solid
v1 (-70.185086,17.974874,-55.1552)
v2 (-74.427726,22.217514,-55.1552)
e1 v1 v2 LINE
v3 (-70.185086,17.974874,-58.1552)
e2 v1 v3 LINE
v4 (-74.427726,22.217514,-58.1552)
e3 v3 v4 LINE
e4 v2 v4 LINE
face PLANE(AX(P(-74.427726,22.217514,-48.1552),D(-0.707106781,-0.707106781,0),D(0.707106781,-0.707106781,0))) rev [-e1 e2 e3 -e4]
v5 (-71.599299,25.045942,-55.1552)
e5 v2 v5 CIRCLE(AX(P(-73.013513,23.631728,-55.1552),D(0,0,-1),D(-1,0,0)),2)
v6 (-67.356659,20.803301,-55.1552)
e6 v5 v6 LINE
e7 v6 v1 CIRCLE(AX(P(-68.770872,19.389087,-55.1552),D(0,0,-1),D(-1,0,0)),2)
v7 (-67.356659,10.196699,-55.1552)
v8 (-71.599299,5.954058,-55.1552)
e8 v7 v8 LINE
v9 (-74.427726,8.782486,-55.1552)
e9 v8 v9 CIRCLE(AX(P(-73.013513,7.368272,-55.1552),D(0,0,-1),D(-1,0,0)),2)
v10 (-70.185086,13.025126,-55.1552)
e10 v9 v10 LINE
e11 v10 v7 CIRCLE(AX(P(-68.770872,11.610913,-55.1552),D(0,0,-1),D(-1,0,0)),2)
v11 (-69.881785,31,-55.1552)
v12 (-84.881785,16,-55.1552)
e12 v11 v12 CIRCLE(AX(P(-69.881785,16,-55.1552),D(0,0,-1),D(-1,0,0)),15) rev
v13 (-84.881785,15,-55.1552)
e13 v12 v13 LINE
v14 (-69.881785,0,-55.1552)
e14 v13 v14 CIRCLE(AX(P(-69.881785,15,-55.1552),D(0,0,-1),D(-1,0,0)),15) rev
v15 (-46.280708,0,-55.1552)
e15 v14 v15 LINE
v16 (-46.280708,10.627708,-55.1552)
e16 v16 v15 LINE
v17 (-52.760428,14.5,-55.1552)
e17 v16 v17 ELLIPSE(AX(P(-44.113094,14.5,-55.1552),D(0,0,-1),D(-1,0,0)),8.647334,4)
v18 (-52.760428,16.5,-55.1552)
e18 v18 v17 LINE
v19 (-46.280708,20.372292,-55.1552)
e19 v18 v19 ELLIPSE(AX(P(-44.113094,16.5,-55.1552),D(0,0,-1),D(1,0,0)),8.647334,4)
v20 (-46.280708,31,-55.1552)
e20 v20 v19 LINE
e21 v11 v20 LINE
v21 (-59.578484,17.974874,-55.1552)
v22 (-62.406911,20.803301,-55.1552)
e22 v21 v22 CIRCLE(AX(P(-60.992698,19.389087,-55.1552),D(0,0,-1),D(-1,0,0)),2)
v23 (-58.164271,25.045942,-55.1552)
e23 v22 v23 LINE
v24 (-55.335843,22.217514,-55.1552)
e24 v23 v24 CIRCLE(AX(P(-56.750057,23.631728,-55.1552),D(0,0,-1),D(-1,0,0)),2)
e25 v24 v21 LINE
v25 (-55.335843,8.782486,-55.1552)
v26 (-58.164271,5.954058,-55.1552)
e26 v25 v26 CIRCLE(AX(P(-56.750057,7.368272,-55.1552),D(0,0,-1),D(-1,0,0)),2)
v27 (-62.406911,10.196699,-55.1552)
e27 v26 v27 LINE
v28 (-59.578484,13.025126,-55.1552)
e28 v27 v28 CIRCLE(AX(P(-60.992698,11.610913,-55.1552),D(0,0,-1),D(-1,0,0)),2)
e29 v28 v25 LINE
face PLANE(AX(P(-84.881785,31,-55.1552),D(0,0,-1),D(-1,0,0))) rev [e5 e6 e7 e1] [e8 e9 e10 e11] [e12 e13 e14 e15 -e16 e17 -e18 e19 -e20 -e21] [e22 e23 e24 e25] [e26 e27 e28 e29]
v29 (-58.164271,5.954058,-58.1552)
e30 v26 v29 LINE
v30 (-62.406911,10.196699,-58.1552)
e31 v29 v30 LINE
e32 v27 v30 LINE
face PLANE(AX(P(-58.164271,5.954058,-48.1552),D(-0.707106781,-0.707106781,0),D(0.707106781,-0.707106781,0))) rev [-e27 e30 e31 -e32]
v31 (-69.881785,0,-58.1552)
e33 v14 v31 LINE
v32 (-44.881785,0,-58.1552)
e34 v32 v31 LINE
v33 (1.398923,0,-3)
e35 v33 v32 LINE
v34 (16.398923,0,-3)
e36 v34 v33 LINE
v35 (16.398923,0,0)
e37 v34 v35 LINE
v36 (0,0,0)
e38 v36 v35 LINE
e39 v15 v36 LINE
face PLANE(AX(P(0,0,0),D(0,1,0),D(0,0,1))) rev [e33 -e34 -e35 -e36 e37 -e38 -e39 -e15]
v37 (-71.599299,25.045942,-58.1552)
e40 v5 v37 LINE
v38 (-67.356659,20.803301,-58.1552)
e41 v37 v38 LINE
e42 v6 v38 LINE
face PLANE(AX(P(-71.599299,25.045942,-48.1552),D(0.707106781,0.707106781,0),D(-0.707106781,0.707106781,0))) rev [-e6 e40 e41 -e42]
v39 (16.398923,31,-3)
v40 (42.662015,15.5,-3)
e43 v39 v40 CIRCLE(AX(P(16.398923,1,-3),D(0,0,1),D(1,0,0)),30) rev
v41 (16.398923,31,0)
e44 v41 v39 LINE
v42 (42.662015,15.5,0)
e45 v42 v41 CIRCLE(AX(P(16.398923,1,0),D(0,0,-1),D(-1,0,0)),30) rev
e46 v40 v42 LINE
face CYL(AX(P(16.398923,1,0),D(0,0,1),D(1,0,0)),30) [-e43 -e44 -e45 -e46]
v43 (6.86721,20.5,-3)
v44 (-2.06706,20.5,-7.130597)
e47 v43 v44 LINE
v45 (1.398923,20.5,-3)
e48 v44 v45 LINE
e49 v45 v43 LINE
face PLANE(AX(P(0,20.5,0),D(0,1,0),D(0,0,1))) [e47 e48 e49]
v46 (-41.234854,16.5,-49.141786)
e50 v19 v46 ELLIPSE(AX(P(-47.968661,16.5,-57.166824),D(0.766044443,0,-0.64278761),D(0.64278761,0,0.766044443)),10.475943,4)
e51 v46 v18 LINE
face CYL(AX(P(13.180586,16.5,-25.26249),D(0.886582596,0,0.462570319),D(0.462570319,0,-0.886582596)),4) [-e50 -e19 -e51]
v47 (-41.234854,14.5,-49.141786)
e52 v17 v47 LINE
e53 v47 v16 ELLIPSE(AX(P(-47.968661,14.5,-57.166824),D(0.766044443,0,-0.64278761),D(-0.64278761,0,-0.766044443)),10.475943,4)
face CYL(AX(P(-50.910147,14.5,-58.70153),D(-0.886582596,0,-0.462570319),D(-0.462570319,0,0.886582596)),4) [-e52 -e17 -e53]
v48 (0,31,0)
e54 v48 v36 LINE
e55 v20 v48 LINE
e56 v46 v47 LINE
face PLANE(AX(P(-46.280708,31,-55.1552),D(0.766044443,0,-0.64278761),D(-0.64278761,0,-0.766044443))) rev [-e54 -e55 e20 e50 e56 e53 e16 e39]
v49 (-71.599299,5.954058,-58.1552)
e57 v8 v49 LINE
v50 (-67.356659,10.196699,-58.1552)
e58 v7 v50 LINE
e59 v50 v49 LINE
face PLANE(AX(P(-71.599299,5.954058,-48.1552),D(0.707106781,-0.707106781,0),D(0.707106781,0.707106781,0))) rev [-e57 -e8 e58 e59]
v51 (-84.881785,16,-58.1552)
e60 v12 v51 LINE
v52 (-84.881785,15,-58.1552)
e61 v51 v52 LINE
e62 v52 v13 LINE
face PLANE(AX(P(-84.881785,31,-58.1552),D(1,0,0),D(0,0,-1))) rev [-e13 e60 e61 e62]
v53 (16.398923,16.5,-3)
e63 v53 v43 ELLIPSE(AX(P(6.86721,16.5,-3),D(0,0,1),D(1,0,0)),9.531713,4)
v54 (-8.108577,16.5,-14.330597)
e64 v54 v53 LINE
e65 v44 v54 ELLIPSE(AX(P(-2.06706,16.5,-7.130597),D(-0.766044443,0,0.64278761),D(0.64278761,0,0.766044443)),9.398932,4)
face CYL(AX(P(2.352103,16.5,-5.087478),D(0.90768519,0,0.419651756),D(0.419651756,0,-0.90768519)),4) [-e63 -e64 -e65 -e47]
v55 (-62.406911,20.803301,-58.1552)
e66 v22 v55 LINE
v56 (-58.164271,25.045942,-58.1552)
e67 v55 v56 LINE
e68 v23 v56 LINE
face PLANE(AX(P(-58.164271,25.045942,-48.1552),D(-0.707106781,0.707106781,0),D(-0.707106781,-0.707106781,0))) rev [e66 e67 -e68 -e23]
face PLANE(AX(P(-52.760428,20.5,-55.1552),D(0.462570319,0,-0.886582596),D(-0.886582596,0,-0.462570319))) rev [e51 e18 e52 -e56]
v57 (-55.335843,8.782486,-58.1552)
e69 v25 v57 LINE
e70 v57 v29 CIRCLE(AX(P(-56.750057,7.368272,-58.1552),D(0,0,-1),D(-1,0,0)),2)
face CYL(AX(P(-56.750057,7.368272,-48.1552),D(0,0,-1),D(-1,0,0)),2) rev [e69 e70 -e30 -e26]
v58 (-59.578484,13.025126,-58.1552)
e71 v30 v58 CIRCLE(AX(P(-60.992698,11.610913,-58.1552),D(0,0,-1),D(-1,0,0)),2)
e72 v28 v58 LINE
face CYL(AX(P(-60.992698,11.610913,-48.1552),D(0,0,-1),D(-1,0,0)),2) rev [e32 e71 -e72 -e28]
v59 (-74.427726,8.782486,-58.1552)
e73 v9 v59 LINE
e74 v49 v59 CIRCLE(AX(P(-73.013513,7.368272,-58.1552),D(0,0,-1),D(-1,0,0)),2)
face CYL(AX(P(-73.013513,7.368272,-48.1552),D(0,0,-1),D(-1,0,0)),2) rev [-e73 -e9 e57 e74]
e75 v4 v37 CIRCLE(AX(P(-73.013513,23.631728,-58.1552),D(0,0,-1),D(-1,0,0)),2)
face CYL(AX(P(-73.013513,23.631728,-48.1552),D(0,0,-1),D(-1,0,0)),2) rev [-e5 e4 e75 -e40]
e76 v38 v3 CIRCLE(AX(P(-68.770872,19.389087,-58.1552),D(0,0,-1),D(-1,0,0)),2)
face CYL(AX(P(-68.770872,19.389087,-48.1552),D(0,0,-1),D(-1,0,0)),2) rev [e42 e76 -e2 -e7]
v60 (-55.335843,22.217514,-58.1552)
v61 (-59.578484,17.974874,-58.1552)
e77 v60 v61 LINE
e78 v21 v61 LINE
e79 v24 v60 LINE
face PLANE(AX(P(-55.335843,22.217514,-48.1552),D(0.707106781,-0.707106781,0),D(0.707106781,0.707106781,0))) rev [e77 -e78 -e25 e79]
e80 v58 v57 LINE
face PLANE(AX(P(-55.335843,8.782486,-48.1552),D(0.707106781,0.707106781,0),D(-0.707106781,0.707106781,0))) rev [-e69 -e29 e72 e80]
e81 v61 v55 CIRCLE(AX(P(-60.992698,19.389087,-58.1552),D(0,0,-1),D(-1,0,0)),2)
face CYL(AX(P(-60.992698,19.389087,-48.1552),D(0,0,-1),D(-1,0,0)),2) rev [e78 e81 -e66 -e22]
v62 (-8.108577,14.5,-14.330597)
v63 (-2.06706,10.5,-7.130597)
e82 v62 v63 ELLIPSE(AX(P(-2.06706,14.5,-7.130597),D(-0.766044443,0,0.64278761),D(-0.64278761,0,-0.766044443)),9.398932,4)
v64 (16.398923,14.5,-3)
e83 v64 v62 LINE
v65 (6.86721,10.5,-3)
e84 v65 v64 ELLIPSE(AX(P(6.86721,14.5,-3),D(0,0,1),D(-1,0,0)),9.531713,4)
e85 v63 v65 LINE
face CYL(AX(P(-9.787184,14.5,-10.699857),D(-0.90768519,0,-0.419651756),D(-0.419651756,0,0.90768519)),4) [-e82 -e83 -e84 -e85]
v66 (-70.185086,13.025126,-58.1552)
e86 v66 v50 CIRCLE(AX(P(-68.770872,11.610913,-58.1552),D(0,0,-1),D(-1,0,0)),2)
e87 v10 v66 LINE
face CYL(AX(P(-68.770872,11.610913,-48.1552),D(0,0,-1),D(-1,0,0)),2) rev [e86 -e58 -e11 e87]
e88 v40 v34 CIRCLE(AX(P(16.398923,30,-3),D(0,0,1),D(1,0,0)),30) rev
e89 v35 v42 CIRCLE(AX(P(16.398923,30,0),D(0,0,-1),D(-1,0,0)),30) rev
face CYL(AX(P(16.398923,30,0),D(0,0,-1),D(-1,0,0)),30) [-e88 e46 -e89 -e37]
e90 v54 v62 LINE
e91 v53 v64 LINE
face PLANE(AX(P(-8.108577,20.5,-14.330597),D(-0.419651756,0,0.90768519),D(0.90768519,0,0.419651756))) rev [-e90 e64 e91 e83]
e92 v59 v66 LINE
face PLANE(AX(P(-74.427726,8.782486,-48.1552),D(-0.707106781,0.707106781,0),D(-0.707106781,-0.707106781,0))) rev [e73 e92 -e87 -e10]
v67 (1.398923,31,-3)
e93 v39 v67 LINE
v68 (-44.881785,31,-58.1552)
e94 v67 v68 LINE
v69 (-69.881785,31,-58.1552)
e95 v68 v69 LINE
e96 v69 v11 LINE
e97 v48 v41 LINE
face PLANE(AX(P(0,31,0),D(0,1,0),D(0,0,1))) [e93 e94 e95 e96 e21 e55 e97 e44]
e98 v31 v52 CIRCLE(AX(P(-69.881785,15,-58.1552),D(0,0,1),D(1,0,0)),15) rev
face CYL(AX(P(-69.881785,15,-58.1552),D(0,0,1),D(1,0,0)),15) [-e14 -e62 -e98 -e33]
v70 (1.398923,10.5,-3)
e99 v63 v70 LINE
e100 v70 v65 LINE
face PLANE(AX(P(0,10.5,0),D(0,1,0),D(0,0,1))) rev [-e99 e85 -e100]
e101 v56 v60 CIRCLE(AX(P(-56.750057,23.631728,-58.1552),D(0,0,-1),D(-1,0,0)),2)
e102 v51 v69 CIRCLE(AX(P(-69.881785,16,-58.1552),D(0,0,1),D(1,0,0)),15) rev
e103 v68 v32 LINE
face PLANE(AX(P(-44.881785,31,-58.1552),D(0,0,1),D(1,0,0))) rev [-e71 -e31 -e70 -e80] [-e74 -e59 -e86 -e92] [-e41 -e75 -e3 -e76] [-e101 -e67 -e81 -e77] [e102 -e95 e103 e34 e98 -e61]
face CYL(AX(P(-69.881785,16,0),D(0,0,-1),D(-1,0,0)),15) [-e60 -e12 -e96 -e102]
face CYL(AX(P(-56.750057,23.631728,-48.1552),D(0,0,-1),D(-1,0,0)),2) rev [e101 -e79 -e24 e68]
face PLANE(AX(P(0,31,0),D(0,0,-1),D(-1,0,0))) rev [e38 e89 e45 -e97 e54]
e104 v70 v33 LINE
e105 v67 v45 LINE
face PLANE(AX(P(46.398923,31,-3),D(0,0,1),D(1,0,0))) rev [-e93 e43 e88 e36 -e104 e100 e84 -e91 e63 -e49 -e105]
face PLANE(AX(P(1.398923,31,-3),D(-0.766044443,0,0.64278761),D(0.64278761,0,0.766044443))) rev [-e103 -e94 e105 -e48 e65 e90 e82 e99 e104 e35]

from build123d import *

# Parameters (mm, degrees)
SALIENTE_EXTRUIR2_DEPTH = 31
CORTAR_EXTRUIR1_DEPTH   = 10
REDONDEO4_R             = 15
REDONDEO7_R             = 30
SALIENTE_EXTRUIR3_DEPTH = 5
REDONDEO8_R             = 4
REDONDEO9_R             = 4
REDONDEO11_R            = 4


with BuildPart() as part:
    # Croquis2 → Saliente-Extruir2 (new body)
    with BuildSketch(Plane(origin=(0, 0, 0), x_dir=(1, 0, 0), z_dir=(0, 1, 0))):
        Polygon((-84.881784923, 58.155199905), (-84.881784923, 55.155199905), (-46.280707897, 55.155199905), (0, 0), (46.398922974, 0), (46.398922974, 3), (1.398922974, 3), (-44.881784923, 58.155199905), align=None)
    extrude(amount=SALIENTE_EXTRUIR2_DEPTH)

    # Croquis3 → Cortar-Extruir1 (cut)
    with BuildSketch(Plane(origin=(0, 0, -58.155199905), x_dir=(-1, 0, 0), z_dir=(0, 0, -1))):
        with BuildLine():
            Line((58.164270502, 25.045941546), (62.406911189, 20.803300859))
            ThreePointArc((62.406911189, 20.803300859), (62.406911189, 17.974873734), (59.578484064, 17.974873734))
            Line((59.578484064, 17.974873734), (55.335843377, 22.217514421))
            ThreePointArc((55.335843377, 22.217514421), (55.335843377, 25.045941546), (58.164270502, 25.045941546))
        make_face()
        with BuildLine():
            Line((71.599299344, 5.954058454), (67.356658657, 10.196699141))
            ThreePointArc((67.356658657, 10.196699141), (67.356658657, 13.025126266), (70.185085782, 13.025126266))
            Line((70.185085782, 13.025126266), (74.427726469, 8.782485579))
            ThreePointArc((74.427726469, 8.782485579), (74.427726469, 5.954058454), (71.599299344, 5.954058454))
        make_face()
        with BuildLine():
            Line((74.427726469, 22.217514421), (70.185085782, 17.974873734))
            ThreePointArc((70.185085782, 17.974873734), (67.356658657, 17.974873734), (67.356658657, 20.803300859))
            Line((67.356658657, 20.803300859), (71.599299344, 25.045941546))
            ThreePointArc((71.599299344, 25.045941546), (74.427726469, 25.045941546), (74.427726469, 22.217514421))
        make_face()
        with BuildLine():
            Line((55.335843377, 8.782485579), (59.578484064, 13.025126266))
            ThreePointArc((59.578484064, 13.025126266), (62.406911189, 13.025126266), (62.406911189, 10.196699141))
            Line((62.406911189, 10.196699141), (58.164270502, 5.954058454))
            ThreePointArc((58.164270502, 5.954058454), (55.335843377, 5.954058454), (55.335843377, 8.782485579))
        make_face()
    extrude(amount=-CORTAR_EXTRUIR1_DEPTH, mode=Mode.SUBTRACT)

    # Redondeo4
    redondeo4_edges = [part.edges().sort_by_distance(p)[0] for p in [
        (-84.881784923, 0, -56.655199905),
        (-84.881784923, 31, -56.655199905),
    ]]
    fillet(redondeo4_edges, radius=REDONDEO4_R)

    # Redondeo7
    # the kernel refuses this fillet: 30 mm, written as the material it takes off along each edge
    with BuildSketch(Plane(origin=(46.398922974, 0, 75), x_dir=(-1, 0, 0), z_dir=(0, 0, -1))) as redondeo7_piece_1:
        with BuildLine():
            CenterArc((REDONDEO7_R, REDONDEO7_R), REDONDEO7_R, 180, 90)
            Line((0, REDONDEO7_R), (0, 0))
            Line((0, 0), (REDONDEO7_R, 0))
        make_face()
    extrude(amount=153, mode=Mode.SUBTRACT)
    with BuildSketch(Plane(origin=(46.398922974, 31, 75), x_dir=(-1, 0, 0), z_dir=(0, 0, -1))) as redondeo7_piece_2:
        with BuildLine():
            CenterArc((REDONDEO7_R, -REDONDEO7_R), REDONDEO7_R, 90, 90)
            Line((0, -REDONDEO7_R), (0, 0))
            Line((0, 0), (REDONDEO7_R, 0))
        make_face()
    extrude(amount=153, mode=Mode.SUBTRACT)

    # Croquis4 → Saliente-Extruir3 (add, symmetric)
    with BuildSketch(Plane(origin=(0, 15.5, 0), x_dir=(1, 0, 0), z_dir=(0, 1, 0))):
        Polygon((-8.108577144, 14.330597423), (16.398922974, 3), (1.398922974, 3), align=None)
        Polygon((-52.760428047, 55.155199905), (-41.234854299, 49.141785751), (-46.280707897, 55.155199905), align=None)
    extrude(amount=SALIENTE_EXTRUIR3_DEPTH, both=True)

    # Redondeo8
    redondeo8_edges = [part.edges().sort_by_distance(p)[0] for p in [
        (4.145172915, 20.5, -8.665298711),
    ]]
    fillet(redondeo8_edges, radius=REDONDEO8_R)

    # Redondeo9
    redondeo9_edges = [part.edges().sort_by_distance(p)[0] for p in [
        (4.145172915, 10.5, -8.665298711),
    ]]
    fillet(redondeo9_edges, radius=REDONDEO9_R)

    # Redondeo11
    # the kernel refuses this fillet: 4 mm, written as the material it takes off along each edge
    with BuildSketch(Plane(origin=(-61.626254007, 10.5, -59.780903099), x_dir=(0, 1, 0), z_dir=(0.886582596003956, 0, 0.4625703194789808))) as redondeo11_piece_1_section:
        with BuildLine():
            CenterArc((REDONDEO11_R, -REDONDEO11_R), REDONDEO11_R, 90, 90)
            Line((0, -REDONDEO11_R), (0, 0))
            Line((0, 0), (REDONDEO11_R, 0))
        make_face()
    redondeo11_piece_1 = extrude(amount=33, mode=Mode.PRIVATE)
    redondeo11_piece_1 = split(redondeo11_piece_1, bisect_by=Plane(origin=(-45.320912512, 11.608841442, -54.011360305), z_dir=(-0.7660444431189792, 0, 0.642787609686538)), keep=Keep.TOP, mode=Mode.PRIVATE)
    redondeo11_piece_1 = split(redondeo11_piece_1, bisect_by=Plane(origin=(-46.861736651, 11.608841442, -55.155199905), z_dir=(0, 0, 1)), keep=Keep.TOP, mode=Mode.PRIVATE)
    add(redondeo11_piece_1, mode=Mode.SUBTRACT)
    with BuildSketch(Plane(origin=(-61.626254007, 20.5, -59.780903099), x_dir=(0.4625703194789808, 0, -0.886582596003956), z_dir=(0.886582596003956, 0, 0.4625703194789808))) as redondeo11_piece_2_section:
        with BuildLine():
            CenterArc((REDONDEO11_R, -REDONDEO11_R), REDONDEO11_R, 90, 90)
            Line((0, -REDONDEO11_R), (0, 0))
            Line((0, 0), (REDONDEO11_R, 0))
        make_face()
    redondeo11_piece_2 = extrude(amount=33, mode=Mode.PRIVATE)
    redondeo11_piece_2 = split(redondeo11_piece_2, bisect_by=Plane(origin=(-45.320912512, 19.391158558, -54.011360306), z_dir=(-0.7660444431189792, 0, 0.642787609686538)), keep=Keep.TOP, mode=Mode.PRIVATE)
    redondeo11_piece_2 = split(redondeo11_piece_2, bisect_by=Plane(origin=(-46.861736651, 19.391158558, -55.155199905), z_dir=(0, 0, 1)), keep=Keep.TOP, mode=Mode.PRIVATE)
    add(redondeo11_piece_2, mode=Mode.SUBTRACT)


solid = part.part
